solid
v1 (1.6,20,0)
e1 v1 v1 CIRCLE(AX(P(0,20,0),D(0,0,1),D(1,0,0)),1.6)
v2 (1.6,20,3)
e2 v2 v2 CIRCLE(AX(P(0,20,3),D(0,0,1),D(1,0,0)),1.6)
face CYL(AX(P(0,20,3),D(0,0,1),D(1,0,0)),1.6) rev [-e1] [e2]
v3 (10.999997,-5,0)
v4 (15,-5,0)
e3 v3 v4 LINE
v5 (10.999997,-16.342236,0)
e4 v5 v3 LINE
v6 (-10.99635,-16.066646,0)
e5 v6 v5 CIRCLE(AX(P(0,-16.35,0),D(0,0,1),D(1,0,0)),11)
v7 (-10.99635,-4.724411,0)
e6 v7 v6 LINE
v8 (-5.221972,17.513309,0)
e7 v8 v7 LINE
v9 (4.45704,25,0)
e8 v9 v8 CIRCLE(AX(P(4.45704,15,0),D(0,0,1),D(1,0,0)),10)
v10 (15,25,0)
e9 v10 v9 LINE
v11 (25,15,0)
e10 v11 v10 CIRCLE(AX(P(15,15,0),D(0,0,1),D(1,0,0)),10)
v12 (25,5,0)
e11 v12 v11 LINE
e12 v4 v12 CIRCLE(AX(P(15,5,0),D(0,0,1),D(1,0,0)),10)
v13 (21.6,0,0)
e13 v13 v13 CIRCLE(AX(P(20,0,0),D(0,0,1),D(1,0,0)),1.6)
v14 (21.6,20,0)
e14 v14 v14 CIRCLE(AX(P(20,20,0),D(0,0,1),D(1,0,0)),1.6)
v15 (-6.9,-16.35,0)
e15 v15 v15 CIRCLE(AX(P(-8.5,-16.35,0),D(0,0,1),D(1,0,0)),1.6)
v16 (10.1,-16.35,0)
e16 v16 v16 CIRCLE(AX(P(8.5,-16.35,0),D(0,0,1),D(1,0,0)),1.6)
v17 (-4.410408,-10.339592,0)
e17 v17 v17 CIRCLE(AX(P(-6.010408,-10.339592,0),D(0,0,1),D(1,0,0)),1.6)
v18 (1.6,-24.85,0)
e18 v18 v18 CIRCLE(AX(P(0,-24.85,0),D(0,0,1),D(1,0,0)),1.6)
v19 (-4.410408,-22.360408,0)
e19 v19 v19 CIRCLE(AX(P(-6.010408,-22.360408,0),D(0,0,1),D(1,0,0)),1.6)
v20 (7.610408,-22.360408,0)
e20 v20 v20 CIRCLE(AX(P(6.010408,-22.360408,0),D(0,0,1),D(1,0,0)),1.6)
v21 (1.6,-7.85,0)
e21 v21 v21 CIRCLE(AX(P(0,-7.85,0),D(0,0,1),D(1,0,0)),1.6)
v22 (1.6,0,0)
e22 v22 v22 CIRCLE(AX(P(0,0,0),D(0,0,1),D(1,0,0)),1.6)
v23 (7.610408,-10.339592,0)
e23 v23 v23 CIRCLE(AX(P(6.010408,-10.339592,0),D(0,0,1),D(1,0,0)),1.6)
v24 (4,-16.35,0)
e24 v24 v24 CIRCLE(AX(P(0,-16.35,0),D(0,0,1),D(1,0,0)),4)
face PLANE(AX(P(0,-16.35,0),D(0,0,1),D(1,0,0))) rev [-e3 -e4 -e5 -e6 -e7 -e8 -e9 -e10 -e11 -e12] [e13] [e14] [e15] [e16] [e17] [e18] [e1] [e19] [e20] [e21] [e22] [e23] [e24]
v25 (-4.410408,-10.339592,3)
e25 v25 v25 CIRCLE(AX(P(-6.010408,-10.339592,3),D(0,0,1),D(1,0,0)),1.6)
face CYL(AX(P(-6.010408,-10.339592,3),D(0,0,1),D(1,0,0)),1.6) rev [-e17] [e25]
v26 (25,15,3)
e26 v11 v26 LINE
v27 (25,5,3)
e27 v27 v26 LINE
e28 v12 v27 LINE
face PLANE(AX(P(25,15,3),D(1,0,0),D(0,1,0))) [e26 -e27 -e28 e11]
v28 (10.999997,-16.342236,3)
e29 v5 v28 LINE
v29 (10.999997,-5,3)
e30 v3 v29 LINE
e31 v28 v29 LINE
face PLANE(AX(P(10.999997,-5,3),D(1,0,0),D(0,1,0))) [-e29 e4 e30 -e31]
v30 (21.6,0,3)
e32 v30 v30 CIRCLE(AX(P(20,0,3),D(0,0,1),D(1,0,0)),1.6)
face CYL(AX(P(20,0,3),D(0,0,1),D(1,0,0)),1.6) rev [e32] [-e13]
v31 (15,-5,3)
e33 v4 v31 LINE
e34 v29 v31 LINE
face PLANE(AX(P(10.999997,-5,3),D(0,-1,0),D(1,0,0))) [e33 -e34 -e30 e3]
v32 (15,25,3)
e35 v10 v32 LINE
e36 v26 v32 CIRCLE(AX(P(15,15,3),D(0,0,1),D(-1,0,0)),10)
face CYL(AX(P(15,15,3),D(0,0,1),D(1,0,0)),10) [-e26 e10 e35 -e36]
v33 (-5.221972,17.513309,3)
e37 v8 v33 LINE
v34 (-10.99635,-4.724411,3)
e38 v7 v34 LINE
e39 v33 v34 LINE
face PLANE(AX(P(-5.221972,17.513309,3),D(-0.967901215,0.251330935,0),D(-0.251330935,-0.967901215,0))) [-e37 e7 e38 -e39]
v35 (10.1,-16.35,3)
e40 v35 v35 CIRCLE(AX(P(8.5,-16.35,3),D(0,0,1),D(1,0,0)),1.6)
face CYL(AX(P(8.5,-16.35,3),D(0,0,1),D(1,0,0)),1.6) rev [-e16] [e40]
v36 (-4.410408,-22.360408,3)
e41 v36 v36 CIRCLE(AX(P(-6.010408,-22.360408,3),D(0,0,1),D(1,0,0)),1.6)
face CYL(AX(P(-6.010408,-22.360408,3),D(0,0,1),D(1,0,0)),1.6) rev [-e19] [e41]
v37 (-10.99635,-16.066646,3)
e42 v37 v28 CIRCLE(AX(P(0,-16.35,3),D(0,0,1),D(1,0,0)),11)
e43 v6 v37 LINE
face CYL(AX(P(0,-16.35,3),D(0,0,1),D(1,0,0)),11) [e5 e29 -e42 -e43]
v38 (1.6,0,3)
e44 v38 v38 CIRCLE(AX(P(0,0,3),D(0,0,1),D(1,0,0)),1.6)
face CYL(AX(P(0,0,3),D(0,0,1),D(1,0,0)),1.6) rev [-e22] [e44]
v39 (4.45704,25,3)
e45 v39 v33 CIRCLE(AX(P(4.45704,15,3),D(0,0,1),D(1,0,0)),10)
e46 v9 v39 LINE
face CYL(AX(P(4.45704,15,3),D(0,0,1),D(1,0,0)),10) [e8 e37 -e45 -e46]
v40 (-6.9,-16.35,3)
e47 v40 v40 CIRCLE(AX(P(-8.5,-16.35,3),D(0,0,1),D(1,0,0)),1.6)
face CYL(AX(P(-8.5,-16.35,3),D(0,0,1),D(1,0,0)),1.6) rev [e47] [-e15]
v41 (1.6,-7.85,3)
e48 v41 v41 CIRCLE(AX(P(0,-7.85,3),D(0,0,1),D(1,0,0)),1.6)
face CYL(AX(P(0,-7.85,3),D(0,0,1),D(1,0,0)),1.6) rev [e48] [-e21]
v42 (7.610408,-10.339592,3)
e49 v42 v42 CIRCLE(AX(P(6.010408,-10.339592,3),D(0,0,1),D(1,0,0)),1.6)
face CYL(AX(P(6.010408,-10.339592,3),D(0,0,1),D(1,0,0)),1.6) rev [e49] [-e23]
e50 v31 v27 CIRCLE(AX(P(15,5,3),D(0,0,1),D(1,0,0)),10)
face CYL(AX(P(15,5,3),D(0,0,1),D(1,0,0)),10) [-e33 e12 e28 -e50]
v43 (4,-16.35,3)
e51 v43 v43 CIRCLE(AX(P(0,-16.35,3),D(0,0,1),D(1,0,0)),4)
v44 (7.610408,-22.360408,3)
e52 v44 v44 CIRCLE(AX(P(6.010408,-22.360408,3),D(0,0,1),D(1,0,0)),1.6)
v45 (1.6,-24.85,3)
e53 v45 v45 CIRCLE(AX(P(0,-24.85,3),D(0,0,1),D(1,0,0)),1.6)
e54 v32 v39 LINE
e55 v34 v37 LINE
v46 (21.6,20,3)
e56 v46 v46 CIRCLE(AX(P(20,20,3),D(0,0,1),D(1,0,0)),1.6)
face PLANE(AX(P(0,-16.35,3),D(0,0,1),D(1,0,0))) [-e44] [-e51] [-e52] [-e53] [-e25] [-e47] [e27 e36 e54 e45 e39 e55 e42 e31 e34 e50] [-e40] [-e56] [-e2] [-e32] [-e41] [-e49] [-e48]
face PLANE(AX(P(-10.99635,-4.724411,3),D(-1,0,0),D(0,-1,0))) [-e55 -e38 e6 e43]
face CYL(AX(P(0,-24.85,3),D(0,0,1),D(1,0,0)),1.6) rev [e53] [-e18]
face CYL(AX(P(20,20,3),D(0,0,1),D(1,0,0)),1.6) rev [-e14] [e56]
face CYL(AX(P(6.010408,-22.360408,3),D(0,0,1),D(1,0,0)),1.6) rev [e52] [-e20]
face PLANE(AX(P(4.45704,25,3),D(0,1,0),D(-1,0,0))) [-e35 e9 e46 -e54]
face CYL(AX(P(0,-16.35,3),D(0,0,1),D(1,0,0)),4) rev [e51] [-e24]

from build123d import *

# Parameters (mm, degrees)
SKETCH_1_R      = 1.6
SKETCH_1_R_2    = 4
EXTRUDE_1_DEPTH = 3


with BuildPart() as part:
    # Sketch 1 → 填料-伸長1 (new body)
    with BuildSketch(Plane.XY):
        with BuildLine():
            Line((-5.221972445, 17.513309351), (-10.996349884, -4.724410549))
            Line((-10.996349884, -4.724410549), (-10.996349884, -16.06664646))
            ThreePointArc((-10.996349884, -16.06664646), (-0.137806793, -27.349136752), (10.99999726, -16.342235911))
            Line((10.99999726, -16.342235911), (10.99999726, -5))
            Line((10.99999726, -5), (15, -5))
            ThreePointArc((15, -5), (22.071067812, -2.071067812), (25, 5))
            Line((25, 5), (25, 15))
            ThreePointArc((25, 15), (22.071067812, 22.071067812), (15, 25))
            Line((15, 25), (4.4570397, 25))
            ThreePointArc((4.4570397, 25), (-1.661248724, 22.909901817), (-5.221972445, 17.513309351))
        make_face()
        with Locations((20, 20)):
            Circle(SKETCH_1_R, mode=Mode.SUBTRACT)
        with Locations((0, 20)):
            Circle(SKETCH_1_R, mode=Mode.SUBTRACT)
        Circle(SKETCH_1_R, mode=Mode.SUBTRACT)
        with Locations((20, 0)):
            Circle(SKETCH_1_R, mode=Mode.SUBTRACT)
        with Locations((0, -16.35)):
            Circle(SKETCH_1_R_2, mode=Mode.SUBTRACT)
        with Locations((8.5, -16.35)):
            Circle(SKETCH_1_R, mode=Mode.SUBTRACT)
        with Locations((6.01040764, -22.36040764)):
            Circle(SKETCH_1_R, mode=Mode.SUBTRACT)
        with Locations((0, -24.85)):
            Circle(SKETCH_1_R, mode=Mode.SUBTRACT)
        with Locations((-6.01040764, -22.36040764)):
            Circle(SKETCH_1_R, mode=Mode.SUBTRACT)
        with Locations((-8.5, -16.35)):
            Circle(SKETCH_1_R, mode=Mode.SUBTRACT)
        with Locations((-6.01040764, -10.33959236)):
            Circle(SKETCH_1_R, mode=Mode.SUBTRACT)
        with Locations((0, -7.85)):
            Circle(SKETCH_1_R, mode=Mode.SUBTRACT)
        with Locations((6.01040764, -10.33959236)):
            Circle(SKETCH_1_R, mode=Mode.SUBTRACT)
    extrude(amount=EXTRUDE_1_DEPTH)


solid = part.part
